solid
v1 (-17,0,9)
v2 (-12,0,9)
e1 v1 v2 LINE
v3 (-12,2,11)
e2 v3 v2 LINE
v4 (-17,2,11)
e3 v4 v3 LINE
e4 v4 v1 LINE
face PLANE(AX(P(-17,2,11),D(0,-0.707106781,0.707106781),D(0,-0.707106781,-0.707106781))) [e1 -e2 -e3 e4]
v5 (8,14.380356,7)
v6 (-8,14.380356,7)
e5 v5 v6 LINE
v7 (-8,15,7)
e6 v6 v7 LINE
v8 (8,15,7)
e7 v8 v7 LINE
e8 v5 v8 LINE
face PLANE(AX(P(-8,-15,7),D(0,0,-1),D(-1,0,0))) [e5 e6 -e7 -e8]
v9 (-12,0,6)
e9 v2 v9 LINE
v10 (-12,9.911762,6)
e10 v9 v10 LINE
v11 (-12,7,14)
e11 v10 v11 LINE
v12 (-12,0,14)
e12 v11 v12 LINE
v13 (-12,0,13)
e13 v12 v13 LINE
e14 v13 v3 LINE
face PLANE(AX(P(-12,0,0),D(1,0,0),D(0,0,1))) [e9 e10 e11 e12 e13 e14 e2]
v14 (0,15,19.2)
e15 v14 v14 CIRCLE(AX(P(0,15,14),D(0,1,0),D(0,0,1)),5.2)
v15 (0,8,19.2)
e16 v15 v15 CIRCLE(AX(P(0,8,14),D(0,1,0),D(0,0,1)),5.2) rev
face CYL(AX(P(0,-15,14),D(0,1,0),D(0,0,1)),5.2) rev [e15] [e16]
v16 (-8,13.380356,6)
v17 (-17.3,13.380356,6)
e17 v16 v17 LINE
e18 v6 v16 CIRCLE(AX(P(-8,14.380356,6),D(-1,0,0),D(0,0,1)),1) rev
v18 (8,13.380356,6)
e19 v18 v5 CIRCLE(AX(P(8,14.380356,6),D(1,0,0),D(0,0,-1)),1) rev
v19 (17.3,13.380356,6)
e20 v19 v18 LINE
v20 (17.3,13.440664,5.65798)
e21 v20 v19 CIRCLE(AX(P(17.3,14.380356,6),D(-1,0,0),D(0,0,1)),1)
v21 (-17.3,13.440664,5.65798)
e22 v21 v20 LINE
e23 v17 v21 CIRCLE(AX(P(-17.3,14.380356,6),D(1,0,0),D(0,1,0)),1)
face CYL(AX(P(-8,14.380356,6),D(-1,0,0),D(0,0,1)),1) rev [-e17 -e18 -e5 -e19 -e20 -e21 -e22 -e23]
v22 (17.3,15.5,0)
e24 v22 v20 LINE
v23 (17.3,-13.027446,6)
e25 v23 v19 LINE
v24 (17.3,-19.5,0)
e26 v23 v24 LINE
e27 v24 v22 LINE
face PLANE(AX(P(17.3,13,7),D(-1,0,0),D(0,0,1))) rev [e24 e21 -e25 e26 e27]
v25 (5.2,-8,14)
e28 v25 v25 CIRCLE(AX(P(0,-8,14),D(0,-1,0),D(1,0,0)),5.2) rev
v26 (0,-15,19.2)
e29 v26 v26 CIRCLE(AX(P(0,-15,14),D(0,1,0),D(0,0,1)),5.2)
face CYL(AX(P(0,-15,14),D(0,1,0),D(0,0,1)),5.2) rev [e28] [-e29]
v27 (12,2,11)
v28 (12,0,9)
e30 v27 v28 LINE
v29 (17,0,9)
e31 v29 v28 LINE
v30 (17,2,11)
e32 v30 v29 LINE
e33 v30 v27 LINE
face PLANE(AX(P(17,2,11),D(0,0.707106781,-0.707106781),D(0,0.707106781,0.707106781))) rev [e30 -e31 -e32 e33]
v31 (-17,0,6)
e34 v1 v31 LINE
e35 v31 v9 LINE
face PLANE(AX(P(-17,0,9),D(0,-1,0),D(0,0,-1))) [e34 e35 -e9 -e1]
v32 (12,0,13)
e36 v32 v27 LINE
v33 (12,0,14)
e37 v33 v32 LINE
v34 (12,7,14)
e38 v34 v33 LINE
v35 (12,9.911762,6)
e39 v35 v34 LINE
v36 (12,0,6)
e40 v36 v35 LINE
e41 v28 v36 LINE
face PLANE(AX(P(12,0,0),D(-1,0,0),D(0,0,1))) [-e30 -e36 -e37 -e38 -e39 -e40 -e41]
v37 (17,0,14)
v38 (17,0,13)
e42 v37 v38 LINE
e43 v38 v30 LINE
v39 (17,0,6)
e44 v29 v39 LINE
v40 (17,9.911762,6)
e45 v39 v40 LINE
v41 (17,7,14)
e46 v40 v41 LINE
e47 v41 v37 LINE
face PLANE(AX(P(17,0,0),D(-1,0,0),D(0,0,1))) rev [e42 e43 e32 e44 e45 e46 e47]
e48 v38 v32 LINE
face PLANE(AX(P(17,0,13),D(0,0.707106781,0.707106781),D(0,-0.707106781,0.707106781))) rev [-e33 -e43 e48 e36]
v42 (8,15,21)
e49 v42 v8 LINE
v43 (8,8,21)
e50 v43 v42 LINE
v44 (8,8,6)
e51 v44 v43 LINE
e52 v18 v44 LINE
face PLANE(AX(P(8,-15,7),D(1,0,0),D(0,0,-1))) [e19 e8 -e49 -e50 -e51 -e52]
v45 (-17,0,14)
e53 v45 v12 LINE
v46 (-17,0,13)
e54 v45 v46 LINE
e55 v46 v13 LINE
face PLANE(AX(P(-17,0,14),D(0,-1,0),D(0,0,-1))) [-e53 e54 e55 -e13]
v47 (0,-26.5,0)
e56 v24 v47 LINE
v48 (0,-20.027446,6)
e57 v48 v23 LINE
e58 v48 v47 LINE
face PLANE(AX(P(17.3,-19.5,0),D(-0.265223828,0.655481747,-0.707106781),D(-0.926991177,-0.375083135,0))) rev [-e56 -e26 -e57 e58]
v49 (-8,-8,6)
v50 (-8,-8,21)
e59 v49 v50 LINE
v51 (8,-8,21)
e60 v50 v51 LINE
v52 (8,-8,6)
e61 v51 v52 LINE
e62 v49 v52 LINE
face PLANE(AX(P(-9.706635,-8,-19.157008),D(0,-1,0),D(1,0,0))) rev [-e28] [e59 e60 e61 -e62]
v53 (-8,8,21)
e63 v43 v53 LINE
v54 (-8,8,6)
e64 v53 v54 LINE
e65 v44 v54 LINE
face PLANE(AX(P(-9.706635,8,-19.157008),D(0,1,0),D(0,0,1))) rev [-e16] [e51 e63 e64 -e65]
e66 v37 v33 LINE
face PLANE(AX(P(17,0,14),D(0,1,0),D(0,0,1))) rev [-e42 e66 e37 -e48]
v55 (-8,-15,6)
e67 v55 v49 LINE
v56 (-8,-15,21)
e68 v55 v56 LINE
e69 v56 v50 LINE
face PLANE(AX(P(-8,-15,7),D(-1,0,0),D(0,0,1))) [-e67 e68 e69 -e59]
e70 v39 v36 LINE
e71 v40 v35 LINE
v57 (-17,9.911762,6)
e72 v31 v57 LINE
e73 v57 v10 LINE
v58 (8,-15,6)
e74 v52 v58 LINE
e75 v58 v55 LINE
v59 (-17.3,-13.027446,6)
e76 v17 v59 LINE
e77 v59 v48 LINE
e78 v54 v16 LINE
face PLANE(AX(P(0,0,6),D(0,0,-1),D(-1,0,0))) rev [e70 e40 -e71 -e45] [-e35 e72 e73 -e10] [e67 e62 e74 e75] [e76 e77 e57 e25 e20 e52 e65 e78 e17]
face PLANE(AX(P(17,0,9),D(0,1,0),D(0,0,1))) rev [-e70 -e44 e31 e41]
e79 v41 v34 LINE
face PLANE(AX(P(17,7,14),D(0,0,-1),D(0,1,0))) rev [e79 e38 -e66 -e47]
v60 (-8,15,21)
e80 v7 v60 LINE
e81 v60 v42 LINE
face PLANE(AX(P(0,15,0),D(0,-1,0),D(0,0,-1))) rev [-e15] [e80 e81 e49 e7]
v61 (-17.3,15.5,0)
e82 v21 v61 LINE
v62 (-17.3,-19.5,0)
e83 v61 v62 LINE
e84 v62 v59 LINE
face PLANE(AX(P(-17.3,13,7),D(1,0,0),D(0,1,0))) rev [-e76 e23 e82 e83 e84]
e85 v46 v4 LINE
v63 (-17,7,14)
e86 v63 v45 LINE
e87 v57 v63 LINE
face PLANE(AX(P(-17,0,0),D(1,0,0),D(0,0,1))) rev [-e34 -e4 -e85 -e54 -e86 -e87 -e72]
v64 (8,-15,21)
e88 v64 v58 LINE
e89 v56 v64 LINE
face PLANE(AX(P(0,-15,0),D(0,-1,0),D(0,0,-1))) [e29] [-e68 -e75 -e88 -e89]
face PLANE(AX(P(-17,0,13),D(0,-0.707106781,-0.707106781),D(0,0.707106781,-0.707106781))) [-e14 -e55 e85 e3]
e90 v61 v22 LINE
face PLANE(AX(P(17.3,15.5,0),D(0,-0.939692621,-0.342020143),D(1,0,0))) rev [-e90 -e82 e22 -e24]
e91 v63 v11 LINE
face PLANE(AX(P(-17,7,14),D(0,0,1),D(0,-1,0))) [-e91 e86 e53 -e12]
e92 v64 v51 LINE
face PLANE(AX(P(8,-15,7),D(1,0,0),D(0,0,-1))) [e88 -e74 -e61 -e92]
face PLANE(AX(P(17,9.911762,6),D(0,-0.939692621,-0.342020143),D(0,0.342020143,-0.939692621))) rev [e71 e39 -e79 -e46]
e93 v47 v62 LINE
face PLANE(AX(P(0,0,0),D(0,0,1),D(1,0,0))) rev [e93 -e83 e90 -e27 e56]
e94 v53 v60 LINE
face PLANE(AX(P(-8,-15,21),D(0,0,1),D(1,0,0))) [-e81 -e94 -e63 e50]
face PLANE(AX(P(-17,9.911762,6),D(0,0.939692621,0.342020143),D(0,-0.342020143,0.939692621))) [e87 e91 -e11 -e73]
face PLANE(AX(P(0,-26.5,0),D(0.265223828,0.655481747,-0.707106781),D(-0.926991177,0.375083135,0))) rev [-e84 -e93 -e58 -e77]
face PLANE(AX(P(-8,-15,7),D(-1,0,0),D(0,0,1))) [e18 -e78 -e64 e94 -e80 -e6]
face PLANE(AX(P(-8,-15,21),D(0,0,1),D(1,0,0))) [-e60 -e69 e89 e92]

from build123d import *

# Parameters (mm, degrees)
ESBO_O1_W                     = 34.6
ESBO_O1_H                     = 26
RESSALTO_EXTRUS_O1_DEPTH      = 7
ESBO_O10_W                    = 34.6
ESBO_O10_H                    = 2.5
RESSALTO_EXTRUS_O4_DEPTH      = 7
CHANFRO1_SIZE                 = 7
CHANFRO2_SIZE2                = 7
CHANFRO2_SIZE                 = 2.54779164
RESSALTO_EXTRUS_O5_DEPTH      = 15
RESSALTO_EXTRUS_O5_DEPTH_BACK = 15
ESBO_O11_W                    = 16
ESBO_O11_H                    = 14
ESBO_O11_R                    = 5.2
CORTE_EXTRUS_O2_DEPTH         = 1
FILETE1_R                     = 1
RESSALTO_EXTRUS_O6_START      = 12
RESSALTO_EXTRUS_O6_DEPTH      = 5
ESBO_O15_W                    = 19.413269766
ESBO_O15_H                    = 16
CORTE_EXTRUS_O3_DEPTH         = 15


with BuildPart() as part:
    # Esboço1 → Ressalto-extrusão1 (new body)
    with BuildSketch(Plane.XY):
        Rectangle(ESBO_O1_W, ESBO_O1_H)
    extrude(amount=RESSALTO_EXTRUS_O1_DEPTH)

    # Esboço10 → Ressalto-extrusão4 (add)
    with BuildSketch(Plane(origin=(0, 0, 0), x_dir=(-1, 0, 0), z_dir=(0, 0, -1))):
        Polygon((-17.3, -19.5), (0, -26.5), (17.3, -19.5), (17.3, -13), (-17.3, -13), align=None)
        with Locations((0, 14.25)):
            Rectangle(ESBO_O10_W, ESBO_O10_H)
    extrude(amount=-RESSALTO_EXTRUS_O4_DEPTH)

    # Chanfro1
    chanfro1_edges = [part.edges().sort_by_distance(p)[0] for p in [
        (8.65, -23, 7),
        (-8.65, -23, 7),
    ]]
    chamfer(chanfro1_edges, length=CHANFRO1_SIZE - 0.0001)  # a hair under: the kernel refuses the full size

    # Chanfro2
    chanfro2_edges = [part.edges().sort_by_distance(p)[0] for p in [
        (0, 15.5, 7),
    ]]
    chanfro2_side = [part.faces().sort_by_distance(p)[0] for p in [
        (0, 15.449044167, 7),
    ]]
    chamfer(chanfro2_edges, length=CHANFRO2_SIZE - 0.0001, length2=CHANFRO2_SIZE2 - 0.0001, reference=chanfro2_side[0])  # a hair under: the kernel refuses the full size

    # Esboço11 → Ressalto-extrusão5 (add, two sides: drawn at the far end of the back side and taken through both)
    with BuildSketch(Plane(origin=(0, 0, 0), x_dir=(1, 0, 0), z_dir=(0, 1, 0)).offset(-RESSALTO_EXTRUS_O5_DEPTH_BACK)):
        with Locations((0, -14)):
            Rectangle(ESBO_O11_W, ESBO_O11_H)
        with Locations(Location((0, -14, 0), (0, 0, 270))):
            Circle(ESBO_O11_R, mode=Mode.SUBTRACT)
    extrude(amount=RESSALTO_EXTRUS_O5_DEPTH + RESSALTO_EXTRUS_O5_DEPTH_BACK)

    # Esboço13 → Corte-extrusão2 (cut)
    with BuildSketch(Plane.XY.offset(7)):
        Polygon((8, -15), (-8, -15), (-8, 18.845540147), (-17.3, 18.845540147), (-17.3, -24.216996946), (-0.570267535, -24.216996946), (17.3, -21.247378204), (17.3, 18.845540147), (8, 18.845540147), align=None)
    extrude(amount=-CORTE_EXTRUS_O2_DEPTH, mode=Mode.SUBTRACT)

    # Filete1
    filete1_edges = [part.edges().sort_by_distance(p)[0] for p in [
        (0, 12.95230836, 7),
    ]]
    fillet(filete1_edges, radius=FILETE1_R)

    # Esboço14 → Ressalto-extrusão6 (add)
    with BuildSketch(Plane(origin=(0, 0, 0), x_dir=(0, 0, -1), z_dir=(1, 0, 0)).offset(RESSALTO_EXTRUS_O6_START)):
        Polygon((-6, 9.911761874), (-14, 7), (-14, 0), (-13, 0), (-11, 2), (-9, 0), (-6, 0), align=None)
    ressalto_extrus_o6 = extrude(amount=RESSALTO_EXTRUS_O6_DEPTH)

    # Espelhar1: Ressalto-extrusão6 across plane
    add(ressalto_extrus_o6.mirror(Plane(origin=(0, 0, 0), x_dir=(0, 0, 1), z_dir=(1, 0, 0))))

    # Esboço15 → Corte-extrusão3 (cut)
    with BuildSketch(Plane.XY.offset(21)):
        Rectangle(ESBO_O15_W, ESBO_O15_H)
    extrude(amount=-CORTE_EXTRUS_O3_DEPTH, mode=Mode.SUBTRACT)


solid = part.part
